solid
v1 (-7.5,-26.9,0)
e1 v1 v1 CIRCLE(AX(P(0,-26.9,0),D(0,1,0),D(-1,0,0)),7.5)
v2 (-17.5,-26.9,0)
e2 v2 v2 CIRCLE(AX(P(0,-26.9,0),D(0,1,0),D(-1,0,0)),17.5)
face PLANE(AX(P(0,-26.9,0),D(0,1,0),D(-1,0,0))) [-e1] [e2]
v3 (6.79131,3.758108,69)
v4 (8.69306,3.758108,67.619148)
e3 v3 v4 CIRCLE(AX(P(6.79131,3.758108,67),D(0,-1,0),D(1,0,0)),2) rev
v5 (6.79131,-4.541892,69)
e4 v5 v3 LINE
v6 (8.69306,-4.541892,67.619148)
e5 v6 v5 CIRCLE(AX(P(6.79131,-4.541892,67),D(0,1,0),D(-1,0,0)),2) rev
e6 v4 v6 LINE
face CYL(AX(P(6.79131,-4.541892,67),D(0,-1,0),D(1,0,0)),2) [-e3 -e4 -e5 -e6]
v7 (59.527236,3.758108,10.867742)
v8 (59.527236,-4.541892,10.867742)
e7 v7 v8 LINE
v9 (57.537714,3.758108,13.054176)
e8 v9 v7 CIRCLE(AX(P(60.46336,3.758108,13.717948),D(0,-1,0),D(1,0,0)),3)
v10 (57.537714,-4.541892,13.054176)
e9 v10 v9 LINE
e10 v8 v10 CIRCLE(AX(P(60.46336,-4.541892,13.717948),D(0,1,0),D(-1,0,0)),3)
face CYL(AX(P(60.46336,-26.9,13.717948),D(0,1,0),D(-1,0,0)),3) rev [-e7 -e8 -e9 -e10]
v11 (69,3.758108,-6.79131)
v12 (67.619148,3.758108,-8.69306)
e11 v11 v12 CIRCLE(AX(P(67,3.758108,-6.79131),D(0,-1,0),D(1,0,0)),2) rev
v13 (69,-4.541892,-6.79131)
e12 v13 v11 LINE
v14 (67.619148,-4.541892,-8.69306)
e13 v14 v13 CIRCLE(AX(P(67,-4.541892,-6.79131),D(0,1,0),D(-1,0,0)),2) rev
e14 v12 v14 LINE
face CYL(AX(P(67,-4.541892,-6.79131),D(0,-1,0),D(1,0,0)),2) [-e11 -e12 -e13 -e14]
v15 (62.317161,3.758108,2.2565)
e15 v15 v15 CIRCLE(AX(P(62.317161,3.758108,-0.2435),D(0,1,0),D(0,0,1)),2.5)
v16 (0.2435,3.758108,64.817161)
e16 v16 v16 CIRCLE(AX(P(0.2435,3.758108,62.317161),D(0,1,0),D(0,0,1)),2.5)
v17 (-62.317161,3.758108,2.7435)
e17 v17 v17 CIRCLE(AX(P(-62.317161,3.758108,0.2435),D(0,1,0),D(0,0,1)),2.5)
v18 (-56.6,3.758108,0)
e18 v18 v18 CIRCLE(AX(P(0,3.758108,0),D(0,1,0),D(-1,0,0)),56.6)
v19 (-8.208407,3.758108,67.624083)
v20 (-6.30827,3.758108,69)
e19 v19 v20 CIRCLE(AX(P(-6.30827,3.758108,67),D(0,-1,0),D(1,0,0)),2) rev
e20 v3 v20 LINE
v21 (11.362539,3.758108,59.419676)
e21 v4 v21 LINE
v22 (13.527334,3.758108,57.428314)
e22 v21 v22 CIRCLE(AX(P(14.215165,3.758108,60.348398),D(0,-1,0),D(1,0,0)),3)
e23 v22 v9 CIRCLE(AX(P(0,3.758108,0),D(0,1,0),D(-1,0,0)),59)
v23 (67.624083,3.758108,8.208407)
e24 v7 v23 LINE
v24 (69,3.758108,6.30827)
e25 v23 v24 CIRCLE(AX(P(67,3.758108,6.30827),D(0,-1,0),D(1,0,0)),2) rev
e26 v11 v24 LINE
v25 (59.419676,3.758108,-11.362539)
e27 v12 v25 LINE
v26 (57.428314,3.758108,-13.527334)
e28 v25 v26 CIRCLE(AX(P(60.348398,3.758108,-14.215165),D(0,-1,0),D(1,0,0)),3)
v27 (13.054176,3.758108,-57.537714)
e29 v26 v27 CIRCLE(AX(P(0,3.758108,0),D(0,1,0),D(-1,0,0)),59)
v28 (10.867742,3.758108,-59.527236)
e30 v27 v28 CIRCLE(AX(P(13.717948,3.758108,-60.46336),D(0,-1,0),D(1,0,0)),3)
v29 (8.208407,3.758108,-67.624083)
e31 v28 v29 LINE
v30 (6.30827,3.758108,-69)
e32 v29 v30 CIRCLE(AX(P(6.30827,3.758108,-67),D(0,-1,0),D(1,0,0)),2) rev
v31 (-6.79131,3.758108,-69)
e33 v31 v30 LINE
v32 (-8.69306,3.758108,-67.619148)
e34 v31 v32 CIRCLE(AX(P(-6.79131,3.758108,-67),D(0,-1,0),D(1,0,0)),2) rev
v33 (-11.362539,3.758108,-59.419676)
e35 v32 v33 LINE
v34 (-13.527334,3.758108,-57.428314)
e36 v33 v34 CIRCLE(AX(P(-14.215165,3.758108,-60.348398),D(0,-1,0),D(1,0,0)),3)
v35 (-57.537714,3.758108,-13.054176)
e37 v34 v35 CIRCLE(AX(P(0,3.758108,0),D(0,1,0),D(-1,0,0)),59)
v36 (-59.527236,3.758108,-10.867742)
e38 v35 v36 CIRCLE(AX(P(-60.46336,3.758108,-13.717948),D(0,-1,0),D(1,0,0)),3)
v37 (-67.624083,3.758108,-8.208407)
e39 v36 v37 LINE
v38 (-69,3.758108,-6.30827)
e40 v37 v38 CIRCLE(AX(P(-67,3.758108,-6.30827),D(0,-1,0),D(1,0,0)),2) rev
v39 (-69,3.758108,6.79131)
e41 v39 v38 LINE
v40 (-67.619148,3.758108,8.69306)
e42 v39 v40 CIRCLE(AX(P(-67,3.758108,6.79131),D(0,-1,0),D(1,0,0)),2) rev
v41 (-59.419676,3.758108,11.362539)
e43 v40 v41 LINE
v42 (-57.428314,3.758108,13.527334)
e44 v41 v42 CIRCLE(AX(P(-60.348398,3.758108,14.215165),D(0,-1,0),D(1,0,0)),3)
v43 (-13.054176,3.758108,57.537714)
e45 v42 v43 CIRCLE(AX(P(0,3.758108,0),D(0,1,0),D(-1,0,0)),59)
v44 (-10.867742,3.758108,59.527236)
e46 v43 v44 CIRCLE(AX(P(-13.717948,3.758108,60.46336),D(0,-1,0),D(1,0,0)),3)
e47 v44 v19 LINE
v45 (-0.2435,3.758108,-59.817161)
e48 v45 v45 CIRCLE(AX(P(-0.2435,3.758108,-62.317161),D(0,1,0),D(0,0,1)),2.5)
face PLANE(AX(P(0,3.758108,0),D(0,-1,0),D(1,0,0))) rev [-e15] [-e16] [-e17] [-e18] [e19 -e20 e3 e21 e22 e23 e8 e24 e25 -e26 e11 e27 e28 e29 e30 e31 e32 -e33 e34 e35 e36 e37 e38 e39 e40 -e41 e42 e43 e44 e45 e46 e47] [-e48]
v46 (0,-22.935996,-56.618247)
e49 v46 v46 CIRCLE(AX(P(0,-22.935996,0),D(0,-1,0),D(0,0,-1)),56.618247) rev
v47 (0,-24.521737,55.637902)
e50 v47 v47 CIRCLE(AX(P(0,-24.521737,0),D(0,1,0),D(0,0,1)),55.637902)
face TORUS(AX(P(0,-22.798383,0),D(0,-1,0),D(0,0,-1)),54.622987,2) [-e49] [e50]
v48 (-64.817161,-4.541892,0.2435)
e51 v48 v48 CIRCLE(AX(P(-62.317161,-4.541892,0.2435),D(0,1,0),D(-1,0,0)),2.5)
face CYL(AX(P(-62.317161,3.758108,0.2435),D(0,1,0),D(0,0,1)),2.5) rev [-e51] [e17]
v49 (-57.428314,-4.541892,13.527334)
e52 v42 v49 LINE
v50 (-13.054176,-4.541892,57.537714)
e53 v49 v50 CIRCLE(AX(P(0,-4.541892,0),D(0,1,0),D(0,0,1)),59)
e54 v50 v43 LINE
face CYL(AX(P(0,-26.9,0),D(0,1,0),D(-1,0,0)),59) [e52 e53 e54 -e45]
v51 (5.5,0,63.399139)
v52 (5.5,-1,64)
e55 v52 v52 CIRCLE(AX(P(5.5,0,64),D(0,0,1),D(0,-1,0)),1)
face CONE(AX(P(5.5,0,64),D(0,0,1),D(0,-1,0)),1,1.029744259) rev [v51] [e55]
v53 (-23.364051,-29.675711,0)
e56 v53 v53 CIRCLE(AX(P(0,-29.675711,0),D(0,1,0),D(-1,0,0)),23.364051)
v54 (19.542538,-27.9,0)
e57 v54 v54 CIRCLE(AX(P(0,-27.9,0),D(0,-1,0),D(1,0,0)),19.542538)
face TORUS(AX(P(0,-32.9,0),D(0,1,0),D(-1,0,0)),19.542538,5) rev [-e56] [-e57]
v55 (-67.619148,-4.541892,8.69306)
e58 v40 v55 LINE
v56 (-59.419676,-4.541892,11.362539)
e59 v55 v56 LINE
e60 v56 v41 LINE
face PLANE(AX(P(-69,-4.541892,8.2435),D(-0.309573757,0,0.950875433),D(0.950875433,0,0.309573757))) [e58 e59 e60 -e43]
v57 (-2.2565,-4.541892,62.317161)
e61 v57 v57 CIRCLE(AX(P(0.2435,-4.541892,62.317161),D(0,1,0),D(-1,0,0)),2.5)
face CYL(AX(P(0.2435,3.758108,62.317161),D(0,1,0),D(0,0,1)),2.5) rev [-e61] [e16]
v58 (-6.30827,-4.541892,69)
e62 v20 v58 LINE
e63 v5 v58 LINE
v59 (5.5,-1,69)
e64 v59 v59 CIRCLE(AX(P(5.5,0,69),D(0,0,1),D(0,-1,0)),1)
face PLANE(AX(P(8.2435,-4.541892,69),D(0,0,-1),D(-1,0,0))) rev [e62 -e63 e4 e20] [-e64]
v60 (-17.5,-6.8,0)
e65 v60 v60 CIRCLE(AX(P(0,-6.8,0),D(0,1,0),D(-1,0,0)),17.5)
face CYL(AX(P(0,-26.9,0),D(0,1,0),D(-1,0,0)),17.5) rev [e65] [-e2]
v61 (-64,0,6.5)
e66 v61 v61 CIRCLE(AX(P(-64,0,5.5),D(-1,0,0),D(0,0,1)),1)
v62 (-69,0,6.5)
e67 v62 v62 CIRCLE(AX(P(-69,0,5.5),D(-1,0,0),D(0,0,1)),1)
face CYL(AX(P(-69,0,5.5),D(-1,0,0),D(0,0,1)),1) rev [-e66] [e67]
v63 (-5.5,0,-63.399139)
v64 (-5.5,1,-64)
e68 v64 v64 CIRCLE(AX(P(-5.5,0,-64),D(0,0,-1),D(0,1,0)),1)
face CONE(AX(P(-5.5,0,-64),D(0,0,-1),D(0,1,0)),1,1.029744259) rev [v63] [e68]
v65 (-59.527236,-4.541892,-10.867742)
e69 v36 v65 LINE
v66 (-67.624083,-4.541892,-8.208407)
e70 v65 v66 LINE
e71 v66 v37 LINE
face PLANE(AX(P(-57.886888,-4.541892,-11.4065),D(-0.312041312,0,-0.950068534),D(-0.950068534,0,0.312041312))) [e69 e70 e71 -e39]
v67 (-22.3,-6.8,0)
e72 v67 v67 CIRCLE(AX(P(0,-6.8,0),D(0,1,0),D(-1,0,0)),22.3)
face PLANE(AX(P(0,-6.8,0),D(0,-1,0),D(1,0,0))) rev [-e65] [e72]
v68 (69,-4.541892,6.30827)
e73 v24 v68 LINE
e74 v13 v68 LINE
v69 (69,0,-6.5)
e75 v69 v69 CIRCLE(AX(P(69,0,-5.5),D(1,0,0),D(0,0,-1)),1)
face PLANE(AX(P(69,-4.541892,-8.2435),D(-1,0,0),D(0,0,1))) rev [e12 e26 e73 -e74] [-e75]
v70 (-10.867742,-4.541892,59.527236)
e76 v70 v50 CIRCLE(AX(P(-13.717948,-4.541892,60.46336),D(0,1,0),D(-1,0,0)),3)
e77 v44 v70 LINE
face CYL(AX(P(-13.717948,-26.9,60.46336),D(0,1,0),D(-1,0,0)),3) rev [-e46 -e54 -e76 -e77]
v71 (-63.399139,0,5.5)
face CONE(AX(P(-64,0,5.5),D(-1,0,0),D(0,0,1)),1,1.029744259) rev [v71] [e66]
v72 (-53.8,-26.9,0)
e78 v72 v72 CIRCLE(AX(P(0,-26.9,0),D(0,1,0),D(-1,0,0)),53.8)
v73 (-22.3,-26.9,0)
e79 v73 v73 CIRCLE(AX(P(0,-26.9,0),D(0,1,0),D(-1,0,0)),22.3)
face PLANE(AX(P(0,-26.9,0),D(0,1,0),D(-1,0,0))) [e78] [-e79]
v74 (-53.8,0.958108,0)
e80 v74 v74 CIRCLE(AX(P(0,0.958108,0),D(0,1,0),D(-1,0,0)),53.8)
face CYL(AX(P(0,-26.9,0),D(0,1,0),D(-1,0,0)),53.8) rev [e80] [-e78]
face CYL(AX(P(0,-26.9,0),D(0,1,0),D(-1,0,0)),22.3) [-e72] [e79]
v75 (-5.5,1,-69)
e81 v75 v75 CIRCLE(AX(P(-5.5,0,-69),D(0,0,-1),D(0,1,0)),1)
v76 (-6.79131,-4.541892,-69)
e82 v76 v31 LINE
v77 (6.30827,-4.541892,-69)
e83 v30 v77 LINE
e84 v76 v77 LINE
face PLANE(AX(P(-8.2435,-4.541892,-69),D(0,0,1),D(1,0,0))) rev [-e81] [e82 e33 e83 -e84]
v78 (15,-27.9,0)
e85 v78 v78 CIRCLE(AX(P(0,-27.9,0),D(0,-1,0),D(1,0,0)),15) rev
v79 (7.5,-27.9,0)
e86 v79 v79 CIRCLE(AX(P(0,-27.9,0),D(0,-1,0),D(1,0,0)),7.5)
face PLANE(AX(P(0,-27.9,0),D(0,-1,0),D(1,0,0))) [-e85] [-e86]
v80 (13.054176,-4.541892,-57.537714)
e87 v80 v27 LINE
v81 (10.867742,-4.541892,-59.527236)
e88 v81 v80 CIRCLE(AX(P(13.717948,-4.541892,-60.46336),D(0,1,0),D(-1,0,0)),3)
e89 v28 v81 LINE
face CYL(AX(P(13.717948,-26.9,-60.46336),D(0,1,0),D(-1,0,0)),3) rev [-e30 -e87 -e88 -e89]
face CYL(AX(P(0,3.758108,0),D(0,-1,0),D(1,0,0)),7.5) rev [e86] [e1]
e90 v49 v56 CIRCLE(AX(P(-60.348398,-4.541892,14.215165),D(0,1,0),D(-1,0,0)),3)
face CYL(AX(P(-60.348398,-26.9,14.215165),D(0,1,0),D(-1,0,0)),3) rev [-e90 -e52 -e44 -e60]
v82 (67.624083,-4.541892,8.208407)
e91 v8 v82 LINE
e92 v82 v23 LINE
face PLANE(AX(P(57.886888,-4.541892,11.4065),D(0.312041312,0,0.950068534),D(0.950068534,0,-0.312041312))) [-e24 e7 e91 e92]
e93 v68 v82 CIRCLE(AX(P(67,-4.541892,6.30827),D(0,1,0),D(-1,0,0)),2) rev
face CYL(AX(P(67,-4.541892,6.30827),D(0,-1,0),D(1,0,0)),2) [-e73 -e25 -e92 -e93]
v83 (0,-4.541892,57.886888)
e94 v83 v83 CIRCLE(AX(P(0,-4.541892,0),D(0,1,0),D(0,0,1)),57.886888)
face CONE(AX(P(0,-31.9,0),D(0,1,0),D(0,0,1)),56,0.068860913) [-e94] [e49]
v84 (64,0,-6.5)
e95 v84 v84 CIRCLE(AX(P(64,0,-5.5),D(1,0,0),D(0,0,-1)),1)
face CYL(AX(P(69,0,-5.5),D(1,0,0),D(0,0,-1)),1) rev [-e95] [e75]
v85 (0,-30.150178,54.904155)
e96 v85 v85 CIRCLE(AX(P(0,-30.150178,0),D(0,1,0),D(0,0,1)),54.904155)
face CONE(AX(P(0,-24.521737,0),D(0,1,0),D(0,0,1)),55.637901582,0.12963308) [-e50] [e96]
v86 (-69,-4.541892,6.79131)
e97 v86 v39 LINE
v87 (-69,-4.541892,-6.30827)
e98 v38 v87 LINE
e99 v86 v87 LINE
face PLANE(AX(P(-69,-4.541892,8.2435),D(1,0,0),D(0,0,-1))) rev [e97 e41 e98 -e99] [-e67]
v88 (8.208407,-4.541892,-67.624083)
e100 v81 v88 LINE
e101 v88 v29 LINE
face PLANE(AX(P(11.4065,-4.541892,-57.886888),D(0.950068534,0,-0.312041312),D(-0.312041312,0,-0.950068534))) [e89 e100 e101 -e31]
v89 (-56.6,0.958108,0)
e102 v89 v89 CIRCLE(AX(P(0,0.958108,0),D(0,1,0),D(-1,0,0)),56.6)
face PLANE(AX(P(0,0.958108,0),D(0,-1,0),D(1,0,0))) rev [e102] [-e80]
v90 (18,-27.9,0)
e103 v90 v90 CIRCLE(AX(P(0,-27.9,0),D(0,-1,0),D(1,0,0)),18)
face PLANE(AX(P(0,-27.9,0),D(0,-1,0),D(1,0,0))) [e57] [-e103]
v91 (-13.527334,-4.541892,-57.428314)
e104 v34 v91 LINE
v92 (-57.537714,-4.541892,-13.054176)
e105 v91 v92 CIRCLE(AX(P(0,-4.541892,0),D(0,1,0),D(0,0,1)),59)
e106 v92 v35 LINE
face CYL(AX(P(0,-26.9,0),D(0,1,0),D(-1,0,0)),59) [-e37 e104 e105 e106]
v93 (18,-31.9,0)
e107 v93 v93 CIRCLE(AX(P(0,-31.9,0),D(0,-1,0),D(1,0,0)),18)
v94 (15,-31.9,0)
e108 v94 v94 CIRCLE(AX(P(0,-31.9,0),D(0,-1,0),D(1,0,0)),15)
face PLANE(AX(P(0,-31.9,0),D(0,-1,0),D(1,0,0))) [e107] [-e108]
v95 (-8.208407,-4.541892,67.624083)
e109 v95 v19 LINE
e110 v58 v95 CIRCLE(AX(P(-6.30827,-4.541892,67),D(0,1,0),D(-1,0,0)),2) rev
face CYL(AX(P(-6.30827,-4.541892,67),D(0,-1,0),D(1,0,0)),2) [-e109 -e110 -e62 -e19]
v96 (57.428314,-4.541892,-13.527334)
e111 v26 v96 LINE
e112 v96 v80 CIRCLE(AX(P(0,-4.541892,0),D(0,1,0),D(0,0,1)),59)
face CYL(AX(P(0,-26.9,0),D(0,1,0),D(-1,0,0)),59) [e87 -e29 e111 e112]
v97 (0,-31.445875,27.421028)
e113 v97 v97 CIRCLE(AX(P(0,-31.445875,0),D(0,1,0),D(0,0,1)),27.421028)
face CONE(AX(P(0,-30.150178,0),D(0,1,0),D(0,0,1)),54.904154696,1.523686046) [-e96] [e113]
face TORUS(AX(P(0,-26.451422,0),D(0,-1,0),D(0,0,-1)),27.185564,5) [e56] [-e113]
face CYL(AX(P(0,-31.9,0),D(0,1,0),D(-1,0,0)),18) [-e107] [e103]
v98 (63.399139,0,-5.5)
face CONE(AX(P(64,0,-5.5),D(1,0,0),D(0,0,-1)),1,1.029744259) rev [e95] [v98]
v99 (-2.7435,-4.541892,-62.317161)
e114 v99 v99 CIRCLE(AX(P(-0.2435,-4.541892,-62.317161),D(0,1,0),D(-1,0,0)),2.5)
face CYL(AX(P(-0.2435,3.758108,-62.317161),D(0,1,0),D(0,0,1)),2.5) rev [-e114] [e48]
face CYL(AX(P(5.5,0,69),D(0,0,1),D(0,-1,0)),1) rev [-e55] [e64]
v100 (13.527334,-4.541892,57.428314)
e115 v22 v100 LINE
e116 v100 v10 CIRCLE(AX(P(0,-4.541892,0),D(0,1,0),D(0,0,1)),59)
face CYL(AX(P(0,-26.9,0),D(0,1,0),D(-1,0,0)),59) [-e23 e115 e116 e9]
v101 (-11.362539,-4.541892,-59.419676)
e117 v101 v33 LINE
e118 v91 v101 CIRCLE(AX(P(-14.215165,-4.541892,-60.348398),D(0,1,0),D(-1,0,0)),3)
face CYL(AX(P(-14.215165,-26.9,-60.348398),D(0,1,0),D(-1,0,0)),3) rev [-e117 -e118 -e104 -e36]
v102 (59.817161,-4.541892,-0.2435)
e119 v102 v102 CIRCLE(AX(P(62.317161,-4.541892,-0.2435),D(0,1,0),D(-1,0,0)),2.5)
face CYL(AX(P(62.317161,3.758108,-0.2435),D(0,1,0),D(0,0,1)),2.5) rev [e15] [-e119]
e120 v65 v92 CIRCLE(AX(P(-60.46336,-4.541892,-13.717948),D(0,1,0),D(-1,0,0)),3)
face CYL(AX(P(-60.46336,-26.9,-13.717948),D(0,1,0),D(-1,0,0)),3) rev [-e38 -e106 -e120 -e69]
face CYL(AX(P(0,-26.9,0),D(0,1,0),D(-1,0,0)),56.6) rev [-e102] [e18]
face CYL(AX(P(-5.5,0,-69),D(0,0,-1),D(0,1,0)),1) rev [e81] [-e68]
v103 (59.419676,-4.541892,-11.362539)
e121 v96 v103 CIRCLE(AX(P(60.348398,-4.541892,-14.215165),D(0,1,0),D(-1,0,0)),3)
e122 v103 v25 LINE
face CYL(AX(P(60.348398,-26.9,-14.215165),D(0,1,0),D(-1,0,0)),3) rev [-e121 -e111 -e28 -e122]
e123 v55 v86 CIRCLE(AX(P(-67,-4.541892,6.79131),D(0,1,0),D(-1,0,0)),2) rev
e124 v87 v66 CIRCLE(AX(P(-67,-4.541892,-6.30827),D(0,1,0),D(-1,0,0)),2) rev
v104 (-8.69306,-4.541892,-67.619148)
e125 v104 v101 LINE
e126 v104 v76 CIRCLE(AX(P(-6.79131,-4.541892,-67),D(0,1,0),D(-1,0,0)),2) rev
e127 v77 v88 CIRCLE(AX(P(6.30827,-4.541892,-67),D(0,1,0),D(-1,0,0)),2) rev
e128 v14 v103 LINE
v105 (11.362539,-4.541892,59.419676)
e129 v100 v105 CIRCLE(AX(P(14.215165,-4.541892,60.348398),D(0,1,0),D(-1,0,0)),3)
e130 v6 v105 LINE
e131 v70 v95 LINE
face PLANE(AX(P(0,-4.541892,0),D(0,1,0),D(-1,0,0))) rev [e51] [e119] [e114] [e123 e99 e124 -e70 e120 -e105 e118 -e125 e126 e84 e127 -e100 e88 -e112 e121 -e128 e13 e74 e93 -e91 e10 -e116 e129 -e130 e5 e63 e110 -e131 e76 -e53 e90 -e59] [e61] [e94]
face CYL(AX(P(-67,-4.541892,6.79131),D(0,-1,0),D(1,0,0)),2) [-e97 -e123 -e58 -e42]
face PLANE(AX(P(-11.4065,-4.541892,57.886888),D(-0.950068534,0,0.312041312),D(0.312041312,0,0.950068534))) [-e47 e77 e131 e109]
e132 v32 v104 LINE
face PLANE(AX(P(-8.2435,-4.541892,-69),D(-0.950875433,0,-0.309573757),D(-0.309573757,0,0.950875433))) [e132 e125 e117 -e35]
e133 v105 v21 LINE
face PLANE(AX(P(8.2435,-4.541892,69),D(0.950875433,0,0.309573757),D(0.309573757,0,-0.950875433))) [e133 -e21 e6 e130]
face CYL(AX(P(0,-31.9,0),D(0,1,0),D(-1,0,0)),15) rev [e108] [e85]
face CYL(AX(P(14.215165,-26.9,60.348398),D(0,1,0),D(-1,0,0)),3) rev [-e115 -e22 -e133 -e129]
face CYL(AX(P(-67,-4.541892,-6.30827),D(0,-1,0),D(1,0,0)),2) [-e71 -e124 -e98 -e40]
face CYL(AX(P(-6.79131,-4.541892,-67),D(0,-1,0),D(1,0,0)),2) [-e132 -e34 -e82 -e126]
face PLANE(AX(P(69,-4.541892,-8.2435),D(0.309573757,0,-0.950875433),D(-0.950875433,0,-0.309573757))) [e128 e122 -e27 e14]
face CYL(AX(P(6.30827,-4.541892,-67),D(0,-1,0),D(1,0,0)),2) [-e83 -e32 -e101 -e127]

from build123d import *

# Parameters (mm, degrees)
BOSS_EXTRUDE2_DEPTH     = 8.3
CIRPATTERN1_COUNT       = 4
SKETCH13_R              = 22.4
CUT_EXTRUDE3_DEPTH      = 4
FILLET1_R               = 5
SKETCH15_R              = 18
SKETCH15_R_2            = 15
BOSS_EXTRUDE3_DEPTH     = 4
SKETCH16_R              = 7.5
CUT_EXTRUDE4_DEPTH      = 103.587698187
FILLET2_R               = 5
FILLET4_R               = 3
FILLET5_R               = 2
FILLET6_R               = 2
TAP_DRILL_FOR_M6_TAP1_D = 5
CIRPATTERN2_COUNT       = 4


with BuildPart() as part:
    # Sketch1 → Revolve1 (revolve)
    with BuildSketch(Plane.XY, mode=Mode.PRIVATE) as revolve1_sk:
        Polygon((22.3, -26.9), (53.8, -26.9), (53.8, 0.95810827), (56.6, 0.95810827), (56.6, 3.75810827), (59, 3.75810827), (59, 0), (59, -31.9), (0, -31.9), (0, -26.9), (17.5, -26.9), (17.5, -6.8), (22.3, -6.8), align=None)
    revolve(revolve1_sk.sketch.rotate(Axis((0, -26.9, 0), (0, -1, 0)), 180), axis=Axis((0, -26.9, 0), (0, -1, 0)))

    # Sketch2 → Boss-Extrude2 (add)
    with BuildSketch(Plane(origin=(0, 3.75810827, 0), x_dir=(1, 0, 0), z_dir=(0, 1, 0))):
        Polygon((7.756499668, 69), (-8.243500332, 69), (-11.893500332, 57.788793462), (11.406499668, 57.88688768), align=None)
    boss_extrude2 = extrude(amount=-BOSS_EXTRUDE2_DEPTH)

    # CirPattern1: Boss-Extrude2 ×4 about axis
    cirpattern1_axis = Axis((0, 0, 0), (0, 1, 0))
    for i in range(1, CIRPATTERN1_COUNT):
        add(boss_extrude2.rotate(cirpattern1_axis, i * 360 / CIRPATTERN1_COUNT))

    # Sketch10 → Cut-Revolve4 (revolve, cut)
    with BuildSketch(Plane(origin=(0, 0, 0), x_dir=(0, 0, -1), z_dir=(1, 0, 0)), mode=Mode.PRIVATE) as cut_revolve4_sk:
        Polygon((59.74122217, -25.056663082), (55.637901582, -24.521737202), (54.676040662, -31.9), (59.74122217, -32.409345916), align=None)
    revolve(cut_revolve4_sk.sketch.rotate(Axis((0, -1.306352148, 0), (0, -1, 0)), 281.147212692), axis=Axis((0, -1.306352148, 0), (0, -1, 0)), mode=Mode.SUBTRACT)

    # Sketch8 → Cut-Revolve5 (revolve, cut)
    with BuildSketch(Plane(origin=(0, 0, 0), x_dir=(0, 0, -1), z_dir=(1, 0, 0)), mode=Mode.PRIVATE) as cut_revolve5_sk:
        Polygon((57.88688768, -4.54189173), (59, -4.54189173), (59, -31.9), (56, -31.9), align=None)
    revolve(cut_revolve5_sk.sketch.rotate(Axis((0, 5.358719866, 0), (0, -1, 0)), 180), axis=Axis((0, 5.358719866, 0), (0, -1, 0)), mode=Mode.SUBTRACT)

    # Sketch12 → Cut-Revolve6 (revolve, cut)
    with BuildSketch(Plane(origin=(0, 0, 0), x_dir=(0, 0, -1), z_dir=(1, 0, 0))):
        Polygon((-55.049732908, -31.9), (-54.904154696, -30.15017811), (-17.788536772, -31.9), align=None)
    revolve(axis=Axis((0, 13.859698408, 0), (0, -1, 0)), mode=Mode.SUBTRACT)

    # Sketch13 → Cut-Extrude3 (cut)
    with BuildSketch(Plane.XZ.offset(31.9)):
        Circle(SKETCH13_R)
    extrude(amount=-CUT_EXTRUDE3_DEPTH, mode=Mode.SUBTRACT)

    # Fillet1
    # the kernel refuses this fillet: 5 mm, written as the material it takes off along each edge
    with BuildSketch(Plane(origin=(0, -31.68259181, 0), x_dir=(0, 0, 1), z_dir=(1, 0, 0))) as fillet1_piece_1:
        with BuildLine():
            CenterArc((27.185563904, -5.231169776), FILLET1_R, 87.300779723, 75.858290504)
            Line((22.4, -3.78259181), (22.304288722, -3.753620251))
            ThreePointArc((22.304288722, -3.753620251), (22.3, -1.891295905), (22.3, 0))
            Line((22.3, 0), (22.404709286, 0.099889052))
            Line((22.404709286, 0.099889052), (27.425737475, -0.136828145))
            Line((27.425737475, -0.136828145), (27.421028189, -0.236717197))
        make_face()
    revolve(axis=Axis((0, -31.68259181, 0), (0, -1, 0)), revolution_arc=270, mode=Mode.SUBTRACT)
    with BuildSketch(Plane(origin=(0, -31.68259181, 0), x_dir=(1, 0, 0), z_dir=(0, 0, -1))) as fillet1_piece_2:
        with BuildLine():
            CenterArc((27.185563904, -5.231169776), FILLET1_R, 87.300779723, 75.858290504)
            Line((22.4, -3.78259181), (22.304288722, -3.753620251))
            ThreePointArc((22.304288722, -3.753620251), (22.3, -1.891295905), (22.3, 0))
            Line((22.3, 0), (22.404709286, 0.099889052))
            Line((22.404709286, 0.099889052), (27.425737475, -0.136828145))
            Line((27.425737475, -0.136828145), (27.421028189, -0.236717197))
        make_face()
    revolve(axis=Axis((0, -31.68259181, 0), (0, -1, 0)), revolution_arc=90, mode=Mode.SUBTRACT)

    # Sketch15 → Boss-Extrude3 (add)
    with BuildSketch(Plane.XZ.offset(27.9)):
        Circle(SKETCH15_R)
        Circle(SKETCH15_R_2, mode=Mode.SUBTRACT)
    extrude(amount=BOSS_EXTRUDE3_DEPTH)

    # Sketch16 → Cut-Extrude4 (cut, through all)
    with BuildSketch(Plane.XZ.offset(27.9)):
        Circle(SKETCH16_R)
    extrude(amount=-CUT_EXTRUDE4_DEPTH, mode=Mode.SUBTRACT)

    # Fillet2
    fillet2_edges = [part.edges().sort_by_distance(p)[0] for p in [
        (-22.4, -27.9, 0),
    ]]
    fillet(fillet2_edges, radius=FILLET2_R)

    # Fillet4
    fillet4_edges = [part.edges().sort_by_distance(p)[0] for p in [
        (11.406499668, -0.39189173, -57.88688768),
        (-11.893500332, -0.39189173, -57.788793462),
        (-57.88688768, -0.39189173, -11.406499668),
        (-57.788793462, -0.39189173, 11.893500332),
        (-11.406499668, -0.39189173, 57.88688768),
        (11.893500332, -0.39189173, 57.788793462),
        (57.88688768, -0.39189173, 11.406499668),
        (57.788793462, -0.39189173, -11.893500332),
    ]]
    fillet(fillet4_edges, radius=FILLET4_R)

    # Fillet5
    fillet5_edges = [part.edges().sort_by_distance(p)[0] for p in [
        (-8.243500332, -0.39189173, -69),
        (7.756499668, -0.39189173, -69),
        (-69, -0.39189173, 8.243500332),
        (-69, -0.39189173, -7.756499668),
        (8.243500332, -0.39189173, 69),
        (-7.756499668, -0.39189173, 69),
        (69, -0.39189173, -8.243500332),
        (69, -0.39189173, 7.756499668),
    ]]
    fillet(fillet5_edges, radius=FILLET5_R)

    # Fillet6
    # the kernel refuses this fillet: 2 mm, written as the material it takes off along each edge
    with BuildSketch(Plane(origin=(0, -24.634269562, 0), x_dir=(0, 0, 1), z_dir=(-1, 0, 0))) as fillet6_piece_1:
        with BuildLine():
            CenterArc((54.622986935, 1.835886142), FILLET6_R, 300.494611252, 55.559949074)
            Line((55.637901582, 0.112532359), (55.658199875, 0.078065284))
            ThreePointArc((55.658199875, 0.078065284), (56.064338554, 0.016601804), (56.495946338, -0.039664376))
            Line((56.495946338, -0.039664376), (56.541022351, -0.00275226))
            Line((56.541022351, -0.00275226), (56.658152184, 1.695520873))
            Line((56.658152184, 1.695520873), (56.618246983, 1.698273133))
        make_face()
    revolve(axis=Axis((0, -24.634269562, 0), (0, 1, 0)), revolution_arc=258.852787308, mode=Mode.SUBTRACT)
    with BuildSketch(Plane(origin=(0, -24.634269562, 0), x_dir=(-0.9811336895007642, 0, -0.1933305028354758), z_dir=(0.1933305028354758, 0, -0.9811336895007642))) as fillet6_piece_2:
        with BuildLine():
            CenterArc((54.622986935, 1.835886142), FILLET6_R, 300.494611252, 55.559949074)
            Line((55.637901582, 0.112532359), (55.658199875, 0.078065284))
            ThreePointArc((55.658199875, 0.078065284), (56.064338554, 0.016601804), (56.495946338, -0.039664376))
            Line((56.495946338, -0.039664376), (56.541022351, -0.00275226))
            Line((56.541022351, -0.00275226), (56.658152184, 1.695520873))
            Line((56.658152184, 1.695520873), (56.618246983, 1.698273133))
        make_face()
    revolve(axis=Axis((0, -24.634269562, 0), (0, 1, 0)), revolution_arc=101.147212692, mode=Mode.SUBTRACT)

    # Tap Drill for M6 Tap1 (through all)
    with Locations(Plane(origin=(0, 3.75810827, 0), x_dir=(1, 0, 0), z_dir=(0, 1, 0))):
        with Locations((-0.243500332, 62.31716076), (62.31716076, 0.243500332), (0.243500332, -62.31716076), (-62.31716076, -0.243500332)):
            Hole(TAP_DRILL_FOR_M6_TAP1_D / 2)

    # Sketch34 → Ø2.0 (2) Diameter Hole4 (revolve, cut)
    with BuildSketch(Plane(origin=(69, 0, -5.5), x_dir=(0, 0, -1), z_dir=(0, 1, 0))):
        Polygon((0, 0), (0, 5.600860619), (1, 5), (1, 0), align=None)
    f_2_0_2_diameter_hole4 = revolve(axis=Axis((75.35, 0, -5.5), (-1, 0, 0)), mode=Mode.SUBTRACT)

    # CirPattern2: Ø2.0 (2) Diameter Hole4 ×4 about axis
    cirpattern2_axis = Axis((0, -26.9, 0), (0, 1, 0))
    for i in range(1, CIRPATTERN2_COUNT):
        add(f_2_0_2_diameter_hole4.rotate(cirpattern2_axis, i * 360 / CIRPATTERN2_COUNT), mode=Mode.SUBTRACT)


solid = part.part
